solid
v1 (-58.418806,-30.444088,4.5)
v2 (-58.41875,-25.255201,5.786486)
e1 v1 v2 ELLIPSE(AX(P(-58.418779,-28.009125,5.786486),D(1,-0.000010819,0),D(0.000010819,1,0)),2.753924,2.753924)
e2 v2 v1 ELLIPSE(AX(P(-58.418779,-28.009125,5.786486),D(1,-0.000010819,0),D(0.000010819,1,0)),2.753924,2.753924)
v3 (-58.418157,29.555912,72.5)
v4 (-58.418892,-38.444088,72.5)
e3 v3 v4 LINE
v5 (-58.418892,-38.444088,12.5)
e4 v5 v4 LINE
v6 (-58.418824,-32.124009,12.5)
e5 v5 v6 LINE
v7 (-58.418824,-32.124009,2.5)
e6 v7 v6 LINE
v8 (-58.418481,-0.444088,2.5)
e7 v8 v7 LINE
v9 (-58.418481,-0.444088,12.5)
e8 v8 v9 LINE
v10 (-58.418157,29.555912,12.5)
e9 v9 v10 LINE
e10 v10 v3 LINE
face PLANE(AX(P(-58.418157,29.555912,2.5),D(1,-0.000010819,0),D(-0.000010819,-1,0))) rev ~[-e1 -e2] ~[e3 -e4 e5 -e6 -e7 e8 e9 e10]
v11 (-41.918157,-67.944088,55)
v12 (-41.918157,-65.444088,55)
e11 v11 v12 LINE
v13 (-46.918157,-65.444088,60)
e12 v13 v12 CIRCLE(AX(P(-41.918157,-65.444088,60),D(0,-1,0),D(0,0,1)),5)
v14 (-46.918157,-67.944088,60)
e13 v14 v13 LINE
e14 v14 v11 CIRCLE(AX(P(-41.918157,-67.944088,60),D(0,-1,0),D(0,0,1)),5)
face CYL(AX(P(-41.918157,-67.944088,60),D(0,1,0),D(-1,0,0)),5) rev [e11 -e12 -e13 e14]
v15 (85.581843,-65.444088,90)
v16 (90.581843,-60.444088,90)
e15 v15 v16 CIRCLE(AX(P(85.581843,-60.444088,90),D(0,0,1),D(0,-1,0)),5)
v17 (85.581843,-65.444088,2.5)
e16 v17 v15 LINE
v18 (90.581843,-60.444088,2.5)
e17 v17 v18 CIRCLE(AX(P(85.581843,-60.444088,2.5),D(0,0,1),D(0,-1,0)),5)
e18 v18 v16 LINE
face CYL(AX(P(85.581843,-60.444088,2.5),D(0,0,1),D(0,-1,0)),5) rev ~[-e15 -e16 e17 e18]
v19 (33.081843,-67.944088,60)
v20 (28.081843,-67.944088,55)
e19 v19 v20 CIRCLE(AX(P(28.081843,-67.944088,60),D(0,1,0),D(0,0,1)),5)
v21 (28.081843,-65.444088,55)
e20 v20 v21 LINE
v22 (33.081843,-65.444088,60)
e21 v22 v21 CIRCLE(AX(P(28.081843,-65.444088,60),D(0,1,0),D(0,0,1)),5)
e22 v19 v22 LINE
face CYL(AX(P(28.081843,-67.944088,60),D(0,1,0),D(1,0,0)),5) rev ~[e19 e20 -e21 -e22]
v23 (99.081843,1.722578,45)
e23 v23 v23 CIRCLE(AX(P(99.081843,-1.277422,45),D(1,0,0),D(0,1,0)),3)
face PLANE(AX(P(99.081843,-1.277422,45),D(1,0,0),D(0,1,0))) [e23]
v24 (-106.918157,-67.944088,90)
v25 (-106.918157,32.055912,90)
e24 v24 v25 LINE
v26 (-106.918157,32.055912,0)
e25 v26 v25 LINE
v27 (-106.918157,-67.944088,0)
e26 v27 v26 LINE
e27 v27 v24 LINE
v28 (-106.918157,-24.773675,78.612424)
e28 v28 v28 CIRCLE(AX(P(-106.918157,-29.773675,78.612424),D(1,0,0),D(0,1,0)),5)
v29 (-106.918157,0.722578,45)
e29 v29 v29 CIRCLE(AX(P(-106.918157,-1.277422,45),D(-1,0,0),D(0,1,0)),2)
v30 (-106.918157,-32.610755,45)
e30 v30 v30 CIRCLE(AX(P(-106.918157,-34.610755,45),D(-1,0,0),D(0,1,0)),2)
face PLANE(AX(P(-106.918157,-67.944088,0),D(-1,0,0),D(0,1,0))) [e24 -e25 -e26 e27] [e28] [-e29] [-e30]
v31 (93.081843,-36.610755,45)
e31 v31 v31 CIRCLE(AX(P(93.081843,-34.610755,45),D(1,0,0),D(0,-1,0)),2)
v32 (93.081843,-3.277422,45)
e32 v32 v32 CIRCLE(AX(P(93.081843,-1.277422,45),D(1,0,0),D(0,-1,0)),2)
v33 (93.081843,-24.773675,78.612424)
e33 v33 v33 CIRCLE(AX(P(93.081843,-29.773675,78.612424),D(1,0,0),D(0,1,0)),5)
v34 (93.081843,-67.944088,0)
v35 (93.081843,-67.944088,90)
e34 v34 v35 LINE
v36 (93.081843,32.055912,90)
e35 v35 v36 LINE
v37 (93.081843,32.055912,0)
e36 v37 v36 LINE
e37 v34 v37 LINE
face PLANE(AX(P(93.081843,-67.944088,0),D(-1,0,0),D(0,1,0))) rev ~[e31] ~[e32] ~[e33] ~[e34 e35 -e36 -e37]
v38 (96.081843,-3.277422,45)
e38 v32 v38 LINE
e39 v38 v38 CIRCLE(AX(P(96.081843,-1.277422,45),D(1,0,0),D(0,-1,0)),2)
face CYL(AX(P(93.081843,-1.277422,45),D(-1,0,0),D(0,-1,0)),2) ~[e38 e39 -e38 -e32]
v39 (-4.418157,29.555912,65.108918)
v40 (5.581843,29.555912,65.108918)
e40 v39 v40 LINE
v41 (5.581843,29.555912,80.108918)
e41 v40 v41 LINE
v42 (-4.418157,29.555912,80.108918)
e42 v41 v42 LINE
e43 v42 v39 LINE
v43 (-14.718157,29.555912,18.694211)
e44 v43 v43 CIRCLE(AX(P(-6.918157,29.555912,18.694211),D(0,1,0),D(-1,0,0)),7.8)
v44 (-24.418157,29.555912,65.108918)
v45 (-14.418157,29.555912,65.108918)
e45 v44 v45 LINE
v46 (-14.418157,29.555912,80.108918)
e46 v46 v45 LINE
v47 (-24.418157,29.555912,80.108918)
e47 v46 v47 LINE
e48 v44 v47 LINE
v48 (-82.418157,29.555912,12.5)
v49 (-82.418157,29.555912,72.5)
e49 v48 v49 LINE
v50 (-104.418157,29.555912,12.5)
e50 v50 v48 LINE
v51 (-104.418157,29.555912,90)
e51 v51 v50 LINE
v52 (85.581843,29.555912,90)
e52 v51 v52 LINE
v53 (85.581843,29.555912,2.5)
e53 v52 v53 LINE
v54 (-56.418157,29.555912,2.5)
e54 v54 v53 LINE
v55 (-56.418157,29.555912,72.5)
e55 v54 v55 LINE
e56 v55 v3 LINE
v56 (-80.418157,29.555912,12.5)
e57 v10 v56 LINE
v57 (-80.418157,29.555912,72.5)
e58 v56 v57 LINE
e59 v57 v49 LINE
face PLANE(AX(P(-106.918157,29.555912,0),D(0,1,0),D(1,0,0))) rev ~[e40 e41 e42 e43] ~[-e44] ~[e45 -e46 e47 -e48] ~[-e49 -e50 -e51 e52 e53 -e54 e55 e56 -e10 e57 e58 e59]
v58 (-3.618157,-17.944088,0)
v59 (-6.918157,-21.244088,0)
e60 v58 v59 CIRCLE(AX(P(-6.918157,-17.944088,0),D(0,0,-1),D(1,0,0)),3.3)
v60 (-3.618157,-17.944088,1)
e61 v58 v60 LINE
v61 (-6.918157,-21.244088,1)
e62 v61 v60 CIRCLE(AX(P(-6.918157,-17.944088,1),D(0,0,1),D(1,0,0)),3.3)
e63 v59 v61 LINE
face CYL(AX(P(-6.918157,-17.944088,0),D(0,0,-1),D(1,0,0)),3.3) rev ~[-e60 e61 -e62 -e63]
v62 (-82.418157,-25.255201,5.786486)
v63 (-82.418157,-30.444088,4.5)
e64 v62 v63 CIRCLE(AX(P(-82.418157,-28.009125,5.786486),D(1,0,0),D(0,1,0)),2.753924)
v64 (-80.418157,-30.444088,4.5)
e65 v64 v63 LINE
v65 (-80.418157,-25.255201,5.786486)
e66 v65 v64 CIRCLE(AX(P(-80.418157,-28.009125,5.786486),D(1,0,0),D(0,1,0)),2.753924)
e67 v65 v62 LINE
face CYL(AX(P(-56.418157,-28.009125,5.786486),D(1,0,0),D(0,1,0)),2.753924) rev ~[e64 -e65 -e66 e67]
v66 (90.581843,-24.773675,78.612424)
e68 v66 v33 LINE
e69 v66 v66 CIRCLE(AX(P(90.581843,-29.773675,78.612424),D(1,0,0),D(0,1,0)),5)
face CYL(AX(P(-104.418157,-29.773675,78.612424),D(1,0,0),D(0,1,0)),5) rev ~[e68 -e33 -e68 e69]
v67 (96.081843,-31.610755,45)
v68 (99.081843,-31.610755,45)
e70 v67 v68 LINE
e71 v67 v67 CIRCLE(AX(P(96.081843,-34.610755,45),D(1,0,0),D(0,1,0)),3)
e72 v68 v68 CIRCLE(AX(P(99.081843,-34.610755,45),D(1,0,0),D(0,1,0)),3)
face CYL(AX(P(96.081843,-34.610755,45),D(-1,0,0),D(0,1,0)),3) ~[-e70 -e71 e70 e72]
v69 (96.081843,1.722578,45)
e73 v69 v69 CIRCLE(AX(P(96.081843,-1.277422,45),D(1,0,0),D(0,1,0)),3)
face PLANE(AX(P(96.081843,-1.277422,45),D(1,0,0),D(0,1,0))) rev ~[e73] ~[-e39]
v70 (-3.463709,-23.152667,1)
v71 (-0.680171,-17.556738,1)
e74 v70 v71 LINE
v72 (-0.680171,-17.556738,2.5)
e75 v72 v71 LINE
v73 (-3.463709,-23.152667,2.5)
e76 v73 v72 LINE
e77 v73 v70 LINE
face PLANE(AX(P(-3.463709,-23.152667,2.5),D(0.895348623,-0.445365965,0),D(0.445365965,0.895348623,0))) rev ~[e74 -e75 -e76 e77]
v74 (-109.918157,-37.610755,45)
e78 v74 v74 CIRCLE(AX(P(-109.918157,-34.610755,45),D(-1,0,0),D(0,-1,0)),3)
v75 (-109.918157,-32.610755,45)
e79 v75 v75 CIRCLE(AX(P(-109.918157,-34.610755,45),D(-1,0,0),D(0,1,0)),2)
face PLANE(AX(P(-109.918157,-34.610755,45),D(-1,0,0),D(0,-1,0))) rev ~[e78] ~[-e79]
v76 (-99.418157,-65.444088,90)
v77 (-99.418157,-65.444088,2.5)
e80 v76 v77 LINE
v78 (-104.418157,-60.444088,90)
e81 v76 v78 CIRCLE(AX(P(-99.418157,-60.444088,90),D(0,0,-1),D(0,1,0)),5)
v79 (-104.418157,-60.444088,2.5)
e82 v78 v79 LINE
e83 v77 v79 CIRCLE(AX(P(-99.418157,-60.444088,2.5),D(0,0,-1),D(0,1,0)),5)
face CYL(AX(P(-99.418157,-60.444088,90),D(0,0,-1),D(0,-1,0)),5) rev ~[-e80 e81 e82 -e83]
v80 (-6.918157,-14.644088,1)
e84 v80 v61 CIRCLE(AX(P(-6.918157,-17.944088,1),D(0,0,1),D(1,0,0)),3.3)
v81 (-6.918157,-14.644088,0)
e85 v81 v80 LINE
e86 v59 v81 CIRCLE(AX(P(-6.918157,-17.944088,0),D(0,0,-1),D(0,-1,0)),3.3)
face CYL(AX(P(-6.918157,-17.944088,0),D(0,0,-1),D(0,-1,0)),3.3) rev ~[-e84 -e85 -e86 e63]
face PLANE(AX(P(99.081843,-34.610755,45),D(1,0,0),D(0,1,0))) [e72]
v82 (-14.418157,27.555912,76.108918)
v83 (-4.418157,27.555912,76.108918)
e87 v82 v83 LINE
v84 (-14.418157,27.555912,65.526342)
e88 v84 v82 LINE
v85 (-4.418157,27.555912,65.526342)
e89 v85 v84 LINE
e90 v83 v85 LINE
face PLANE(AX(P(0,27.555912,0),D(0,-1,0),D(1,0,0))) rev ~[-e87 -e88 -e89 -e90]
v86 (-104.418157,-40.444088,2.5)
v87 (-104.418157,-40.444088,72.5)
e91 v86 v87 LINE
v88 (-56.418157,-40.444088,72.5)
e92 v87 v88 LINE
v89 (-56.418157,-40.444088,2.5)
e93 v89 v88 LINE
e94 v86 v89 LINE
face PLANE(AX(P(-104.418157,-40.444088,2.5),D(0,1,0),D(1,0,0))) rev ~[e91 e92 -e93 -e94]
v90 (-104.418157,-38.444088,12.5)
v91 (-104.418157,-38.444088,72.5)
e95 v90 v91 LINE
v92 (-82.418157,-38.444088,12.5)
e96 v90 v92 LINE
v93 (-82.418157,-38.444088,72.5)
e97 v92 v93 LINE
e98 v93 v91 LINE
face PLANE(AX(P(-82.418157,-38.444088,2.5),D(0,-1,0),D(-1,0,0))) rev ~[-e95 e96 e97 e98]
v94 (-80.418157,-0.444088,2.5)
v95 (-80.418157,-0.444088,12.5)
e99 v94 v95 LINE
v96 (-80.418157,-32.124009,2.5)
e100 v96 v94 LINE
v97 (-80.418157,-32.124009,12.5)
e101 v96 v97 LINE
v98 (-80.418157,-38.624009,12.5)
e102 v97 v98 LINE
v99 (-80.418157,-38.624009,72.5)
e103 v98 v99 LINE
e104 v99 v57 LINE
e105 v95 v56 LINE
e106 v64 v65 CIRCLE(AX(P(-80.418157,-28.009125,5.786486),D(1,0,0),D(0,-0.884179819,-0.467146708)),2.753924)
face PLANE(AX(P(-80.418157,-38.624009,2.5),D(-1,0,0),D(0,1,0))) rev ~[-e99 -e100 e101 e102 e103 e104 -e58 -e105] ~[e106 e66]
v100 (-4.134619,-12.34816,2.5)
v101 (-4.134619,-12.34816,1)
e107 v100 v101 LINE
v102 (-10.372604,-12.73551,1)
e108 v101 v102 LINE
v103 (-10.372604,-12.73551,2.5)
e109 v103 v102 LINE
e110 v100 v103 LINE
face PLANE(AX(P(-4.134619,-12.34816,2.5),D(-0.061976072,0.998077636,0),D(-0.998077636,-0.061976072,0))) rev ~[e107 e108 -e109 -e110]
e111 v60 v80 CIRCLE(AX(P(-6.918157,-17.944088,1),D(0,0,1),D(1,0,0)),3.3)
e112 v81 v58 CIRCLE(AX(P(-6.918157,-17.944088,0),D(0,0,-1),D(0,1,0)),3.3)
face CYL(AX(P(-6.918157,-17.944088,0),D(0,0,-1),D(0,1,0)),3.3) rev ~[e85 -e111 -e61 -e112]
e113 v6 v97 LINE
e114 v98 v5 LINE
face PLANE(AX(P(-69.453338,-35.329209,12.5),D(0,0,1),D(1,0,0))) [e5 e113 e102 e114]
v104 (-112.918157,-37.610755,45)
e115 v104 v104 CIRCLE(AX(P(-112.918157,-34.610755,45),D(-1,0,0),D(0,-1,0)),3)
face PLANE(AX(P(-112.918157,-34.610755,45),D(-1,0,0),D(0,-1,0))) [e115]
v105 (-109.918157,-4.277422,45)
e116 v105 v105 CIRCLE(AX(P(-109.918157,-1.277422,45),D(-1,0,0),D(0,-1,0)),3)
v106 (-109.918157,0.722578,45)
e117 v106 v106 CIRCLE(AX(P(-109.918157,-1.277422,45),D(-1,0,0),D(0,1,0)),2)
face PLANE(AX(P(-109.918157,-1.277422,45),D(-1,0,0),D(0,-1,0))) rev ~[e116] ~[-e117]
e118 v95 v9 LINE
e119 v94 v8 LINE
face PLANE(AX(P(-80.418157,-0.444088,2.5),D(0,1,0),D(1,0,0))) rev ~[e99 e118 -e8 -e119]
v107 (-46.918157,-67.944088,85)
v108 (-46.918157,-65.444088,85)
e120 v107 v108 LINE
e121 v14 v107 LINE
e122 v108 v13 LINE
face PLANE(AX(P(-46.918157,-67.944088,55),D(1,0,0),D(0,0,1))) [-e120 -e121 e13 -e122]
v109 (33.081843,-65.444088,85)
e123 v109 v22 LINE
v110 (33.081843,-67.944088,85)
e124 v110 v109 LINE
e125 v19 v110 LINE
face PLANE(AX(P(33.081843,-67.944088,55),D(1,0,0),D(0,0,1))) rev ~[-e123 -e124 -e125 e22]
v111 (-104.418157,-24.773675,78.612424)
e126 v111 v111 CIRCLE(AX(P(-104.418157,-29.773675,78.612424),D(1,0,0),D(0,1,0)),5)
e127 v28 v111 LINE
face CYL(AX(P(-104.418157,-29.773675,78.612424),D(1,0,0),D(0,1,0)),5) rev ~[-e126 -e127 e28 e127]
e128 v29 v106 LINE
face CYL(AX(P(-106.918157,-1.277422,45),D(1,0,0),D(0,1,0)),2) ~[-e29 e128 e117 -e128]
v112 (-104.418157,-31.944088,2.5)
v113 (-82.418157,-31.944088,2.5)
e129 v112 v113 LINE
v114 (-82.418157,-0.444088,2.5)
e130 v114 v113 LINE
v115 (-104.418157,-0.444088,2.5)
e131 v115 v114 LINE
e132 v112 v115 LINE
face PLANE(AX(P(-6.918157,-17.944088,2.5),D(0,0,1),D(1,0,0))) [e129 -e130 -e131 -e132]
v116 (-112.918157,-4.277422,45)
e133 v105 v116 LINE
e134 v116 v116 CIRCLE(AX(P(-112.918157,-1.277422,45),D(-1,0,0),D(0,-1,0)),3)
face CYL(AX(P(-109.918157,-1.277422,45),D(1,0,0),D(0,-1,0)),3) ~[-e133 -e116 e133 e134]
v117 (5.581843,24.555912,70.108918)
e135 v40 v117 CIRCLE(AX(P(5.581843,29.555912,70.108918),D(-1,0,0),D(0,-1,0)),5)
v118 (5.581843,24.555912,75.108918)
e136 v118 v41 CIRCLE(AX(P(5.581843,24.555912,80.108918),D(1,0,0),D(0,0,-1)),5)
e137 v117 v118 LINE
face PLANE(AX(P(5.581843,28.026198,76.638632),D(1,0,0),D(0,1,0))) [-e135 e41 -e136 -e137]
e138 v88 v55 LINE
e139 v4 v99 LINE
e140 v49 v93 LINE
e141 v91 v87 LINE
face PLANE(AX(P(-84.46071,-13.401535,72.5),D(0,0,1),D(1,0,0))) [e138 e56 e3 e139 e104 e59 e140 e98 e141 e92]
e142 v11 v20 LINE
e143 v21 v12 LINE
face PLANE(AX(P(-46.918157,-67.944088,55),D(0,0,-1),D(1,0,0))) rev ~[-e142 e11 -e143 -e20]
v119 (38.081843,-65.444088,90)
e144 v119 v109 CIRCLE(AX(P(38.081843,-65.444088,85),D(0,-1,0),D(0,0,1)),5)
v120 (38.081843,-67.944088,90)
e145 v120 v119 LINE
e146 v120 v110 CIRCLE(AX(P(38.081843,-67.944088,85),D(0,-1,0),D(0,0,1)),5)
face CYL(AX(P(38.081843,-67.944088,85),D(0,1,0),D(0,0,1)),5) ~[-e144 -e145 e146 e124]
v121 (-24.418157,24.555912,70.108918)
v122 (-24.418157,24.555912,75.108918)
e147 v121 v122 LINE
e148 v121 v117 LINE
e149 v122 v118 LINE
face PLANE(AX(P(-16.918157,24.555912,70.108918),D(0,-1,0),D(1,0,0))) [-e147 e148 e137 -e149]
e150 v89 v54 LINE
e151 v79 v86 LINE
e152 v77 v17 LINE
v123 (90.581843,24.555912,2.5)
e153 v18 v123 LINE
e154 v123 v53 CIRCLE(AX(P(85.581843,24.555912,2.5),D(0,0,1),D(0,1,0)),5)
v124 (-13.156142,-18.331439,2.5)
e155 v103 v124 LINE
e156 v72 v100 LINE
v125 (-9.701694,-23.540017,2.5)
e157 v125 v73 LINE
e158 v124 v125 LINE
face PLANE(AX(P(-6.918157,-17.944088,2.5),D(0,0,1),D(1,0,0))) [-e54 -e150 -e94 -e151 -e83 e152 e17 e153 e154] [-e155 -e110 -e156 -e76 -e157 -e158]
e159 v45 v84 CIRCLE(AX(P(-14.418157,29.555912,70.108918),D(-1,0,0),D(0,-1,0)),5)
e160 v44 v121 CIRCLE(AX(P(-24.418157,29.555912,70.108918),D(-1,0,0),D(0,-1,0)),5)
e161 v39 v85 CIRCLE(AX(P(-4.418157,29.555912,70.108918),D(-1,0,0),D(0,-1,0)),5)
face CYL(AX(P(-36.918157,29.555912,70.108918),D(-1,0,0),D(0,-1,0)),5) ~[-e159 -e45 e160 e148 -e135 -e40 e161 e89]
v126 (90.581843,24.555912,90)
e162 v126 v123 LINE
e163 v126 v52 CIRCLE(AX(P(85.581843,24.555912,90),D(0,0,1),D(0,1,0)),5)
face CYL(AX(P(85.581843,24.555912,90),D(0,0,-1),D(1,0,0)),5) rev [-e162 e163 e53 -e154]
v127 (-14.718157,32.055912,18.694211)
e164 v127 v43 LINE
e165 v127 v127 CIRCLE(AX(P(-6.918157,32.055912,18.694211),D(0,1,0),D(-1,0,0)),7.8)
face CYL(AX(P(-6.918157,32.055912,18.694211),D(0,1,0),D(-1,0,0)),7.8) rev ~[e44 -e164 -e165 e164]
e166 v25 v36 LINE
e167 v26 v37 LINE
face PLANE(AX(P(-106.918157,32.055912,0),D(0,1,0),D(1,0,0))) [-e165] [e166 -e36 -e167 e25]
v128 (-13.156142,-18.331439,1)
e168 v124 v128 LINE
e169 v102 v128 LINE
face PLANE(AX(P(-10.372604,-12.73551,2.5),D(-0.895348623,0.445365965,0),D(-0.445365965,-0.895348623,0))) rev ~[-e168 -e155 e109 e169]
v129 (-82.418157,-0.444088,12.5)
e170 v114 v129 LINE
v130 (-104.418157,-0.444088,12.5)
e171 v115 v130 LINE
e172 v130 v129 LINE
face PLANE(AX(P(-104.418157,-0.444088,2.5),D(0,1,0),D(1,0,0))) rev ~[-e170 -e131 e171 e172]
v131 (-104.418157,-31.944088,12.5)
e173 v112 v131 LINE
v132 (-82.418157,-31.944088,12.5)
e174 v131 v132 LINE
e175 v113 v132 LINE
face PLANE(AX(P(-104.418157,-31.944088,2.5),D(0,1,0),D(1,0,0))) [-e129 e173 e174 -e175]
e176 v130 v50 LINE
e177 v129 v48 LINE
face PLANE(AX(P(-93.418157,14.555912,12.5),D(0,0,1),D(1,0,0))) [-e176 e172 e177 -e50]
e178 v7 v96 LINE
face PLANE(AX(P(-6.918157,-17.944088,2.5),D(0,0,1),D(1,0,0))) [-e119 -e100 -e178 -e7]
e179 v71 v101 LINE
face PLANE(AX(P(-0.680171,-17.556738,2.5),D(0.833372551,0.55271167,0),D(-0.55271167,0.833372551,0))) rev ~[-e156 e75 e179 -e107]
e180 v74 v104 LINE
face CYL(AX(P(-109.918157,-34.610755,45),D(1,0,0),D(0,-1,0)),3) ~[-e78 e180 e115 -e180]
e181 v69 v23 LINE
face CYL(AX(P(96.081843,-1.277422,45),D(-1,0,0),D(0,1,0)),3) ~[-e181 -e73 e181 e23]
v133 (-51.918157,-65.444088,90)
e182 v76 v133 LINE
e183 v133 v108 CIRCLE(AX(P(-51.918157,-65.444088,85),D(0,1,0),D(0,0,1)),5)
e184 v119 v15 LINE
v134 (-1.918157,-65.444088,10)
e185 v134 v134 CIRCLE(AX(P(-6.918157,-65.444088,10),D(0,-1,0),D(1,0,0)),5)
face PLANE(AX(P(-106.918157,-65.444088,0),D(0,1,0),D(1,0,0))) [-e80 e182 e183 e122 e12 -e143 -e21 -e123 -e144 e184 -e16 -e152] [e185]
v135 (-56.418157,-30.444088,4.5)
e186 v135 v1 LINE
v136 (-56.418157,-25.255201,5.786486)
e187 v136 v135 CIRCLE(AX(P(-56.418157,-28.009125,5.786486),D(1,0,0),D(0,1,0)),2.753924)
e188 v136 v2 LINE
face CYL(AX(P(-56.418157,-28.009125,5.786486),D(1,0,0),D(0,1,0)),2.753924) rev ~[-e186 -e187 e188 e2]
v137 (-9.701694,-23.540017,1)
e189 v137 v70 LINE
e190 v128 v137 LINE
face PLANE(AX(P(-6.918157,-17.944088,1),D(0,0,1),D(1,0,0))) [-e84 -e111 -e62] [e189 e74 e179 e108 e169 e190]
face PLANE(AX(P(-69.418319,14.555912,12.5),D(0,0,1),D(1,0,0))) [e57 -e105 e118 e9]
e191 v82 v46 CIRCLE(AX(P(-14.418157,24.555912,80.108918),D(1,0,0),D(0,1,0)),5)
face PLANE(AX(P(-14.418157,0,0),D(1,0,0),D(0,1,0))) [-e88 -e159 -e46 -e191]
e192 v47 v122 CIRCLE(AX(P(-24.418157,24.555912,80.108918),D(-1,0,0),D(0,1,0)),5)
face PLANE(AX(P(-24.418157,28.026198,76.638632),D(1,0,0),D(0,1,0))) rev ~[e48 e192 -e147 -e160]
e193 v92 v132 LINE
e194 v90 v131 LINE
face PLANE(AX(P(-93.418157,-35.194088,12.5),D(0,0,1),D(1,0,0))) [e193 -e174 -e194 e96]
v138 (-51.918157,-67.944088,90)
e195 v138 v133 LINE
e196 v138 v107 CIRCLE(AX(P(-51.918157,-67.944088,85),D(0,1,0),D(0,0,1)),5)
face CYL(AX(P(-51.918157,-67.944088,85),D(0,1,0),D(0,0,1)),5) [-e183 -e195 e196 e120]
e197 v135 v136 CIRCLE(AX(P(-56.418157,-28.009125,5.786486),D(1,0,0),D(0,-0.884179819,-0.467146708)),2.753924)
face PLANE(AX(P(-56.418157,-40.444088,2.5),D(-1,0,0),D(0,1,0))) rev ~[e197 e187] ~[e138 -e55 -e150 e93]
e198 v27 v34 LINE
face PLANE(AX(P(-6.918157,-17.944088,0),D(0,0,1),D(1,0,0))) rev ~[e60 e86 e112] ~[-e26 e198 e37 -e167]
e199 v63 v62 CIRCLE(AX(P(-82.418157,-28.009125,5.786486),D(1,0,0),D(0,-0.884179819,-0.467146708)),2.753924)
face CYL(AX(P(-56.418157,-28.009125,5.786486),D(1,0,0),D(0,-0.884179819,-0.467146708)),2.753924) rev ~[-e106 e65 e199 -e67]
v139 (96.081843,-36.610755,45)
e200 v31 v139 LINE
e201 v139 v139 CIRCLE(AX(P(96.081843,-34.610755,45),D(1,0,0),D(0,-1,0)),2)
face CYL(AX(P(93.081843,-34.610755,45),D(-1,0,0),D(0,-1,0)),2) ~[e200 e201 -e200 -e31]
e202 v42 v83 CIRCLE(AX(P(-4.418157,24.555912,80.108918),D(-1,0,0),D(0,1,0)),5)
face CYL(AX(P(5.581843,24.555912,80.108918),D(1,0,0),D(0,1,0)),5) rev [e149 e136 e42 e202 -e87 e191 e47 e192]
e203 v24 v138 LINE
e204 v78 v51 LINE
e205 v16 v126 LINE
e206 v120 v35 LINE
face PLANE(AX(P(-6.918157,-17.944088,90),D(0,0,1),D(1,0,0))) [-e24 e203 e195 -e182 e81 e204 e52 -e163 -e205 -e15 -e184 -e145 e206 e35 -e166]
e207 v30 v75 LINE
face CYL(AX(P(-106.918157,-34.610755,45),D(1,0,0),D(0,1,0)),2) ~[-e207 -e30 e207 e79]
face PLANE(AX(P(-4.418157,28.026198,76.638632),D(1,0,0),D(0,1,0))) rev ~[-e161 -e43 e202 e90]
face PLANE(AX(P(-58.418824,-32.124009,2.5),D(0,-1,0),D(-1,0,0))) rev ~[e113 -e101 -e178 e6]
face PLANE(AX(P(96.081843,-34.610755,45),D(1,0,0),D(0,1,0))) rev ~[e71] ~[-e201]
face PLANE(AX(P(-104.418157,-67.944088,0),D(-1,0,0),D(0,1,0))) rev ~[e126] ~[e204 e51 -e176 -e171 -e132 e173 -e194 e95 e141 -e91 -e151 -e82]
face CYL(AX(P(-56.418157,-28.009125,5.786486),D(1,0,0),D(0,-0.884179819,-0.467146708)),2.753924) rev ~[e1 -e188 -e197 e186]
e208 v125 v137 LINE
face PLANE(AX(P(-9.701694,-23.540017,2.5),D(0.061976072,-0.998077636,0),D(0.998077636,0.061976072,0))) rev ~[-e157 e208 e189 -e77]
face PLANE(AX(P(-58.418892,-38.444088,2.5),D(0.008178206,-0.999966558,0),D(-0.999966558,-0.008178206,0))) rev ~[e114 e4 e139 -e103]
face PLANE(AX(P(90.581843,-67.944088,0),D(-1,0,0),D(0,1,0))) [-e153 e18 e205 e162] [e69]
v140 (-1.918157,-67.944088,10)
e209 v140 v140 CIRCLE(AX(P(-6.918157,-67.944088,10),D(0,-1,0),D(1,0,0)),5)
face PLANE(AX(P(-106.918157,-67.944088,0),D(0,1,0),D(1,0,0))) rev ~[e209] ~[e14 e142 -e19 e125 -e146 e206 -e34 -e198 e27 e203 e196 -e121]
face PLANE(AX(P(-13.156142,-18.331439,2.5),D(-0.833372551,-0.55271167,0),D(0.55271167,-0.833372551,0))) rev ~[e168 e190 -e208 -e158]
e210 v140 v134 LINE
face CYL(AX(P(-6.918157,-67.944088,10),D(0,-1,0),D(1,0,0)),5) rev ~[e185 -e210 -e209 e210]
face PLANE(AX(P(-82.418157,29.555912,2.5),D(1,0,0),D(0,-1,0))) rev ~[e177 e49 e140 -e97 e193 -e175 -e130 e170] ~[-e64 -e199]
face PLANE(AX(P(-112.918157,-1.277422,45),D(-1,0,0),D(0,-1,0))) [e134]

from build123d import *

# Parameters (mm, degrees)
F0_W          = 200
F0_H          = 100
F1_DEPTH      = 90
F2_T          = -2.5
F4_DEPTH      = 70
F5_W          = 80
F5_H          = 35
F5_R          = 5
F6_DEPTH      = 3
F8_DEPTH      = 3
F9_R          = 3.3
F10_DEPTH     = 1.5
F11_R         = 7.8
F12_DEPTH     = 3
F13_R         = 5
F14_R         = 5
F16_DEPTH     = 3
F17_R         = 2
F17_R_2       = 3
F18_R         = 3
F18_R_2       = 2
F19_DEPTH     = 3
F21_DEPTH     = 3
F22_R         = 3
F22_R_2       = 2
F23_DEPTH     = 3
F24_R         = 5
F25_DEPTH     = 400
F26_W         = 22
F26_H         = 30
F26_H_2       = 6.5
F27_W         = 21.9996754151
F27_H         = 30
F29_DEPTH     = 10
F31_W         = 15
F31_H         = 10
F32_DEPTH     = 5
F33_W         = 10
F33_H         = 2
F34_DEPTH     = 10
F35_T4_DEPTH  = 10
F35_T9_DEPTH  = 10
F35_T14_DEPTH = 22.5
F35_T21_DEPTH = 22.5
F35_T27_DEPTH = 22.5
F35_T33_DEPTH = 22.5
F35_T39_DEPTH = 22.5
F35_T45_DEPTH = 22.5
F35_T52_DEPTH = 10
F35_T57_DEPTH = 10
F35_T59_DEPTH = 55
F36_DEPTH     = 35


# Not quite as in the source:
# - a fillet or chamfer that OpenCascade refuses, or shapes differently, is made with other operations: its cross-section is extruded or revolved along the edge and cut away or added
# - ends of sketch curves that miss each other by under 0.0002 mm in the source are joined
# - a feature names something its author has since deleted; it is built from what else it names


with BuildPart() as f1:
    # F0 (on Top) → F1 (new body)
    with BuildSketch(Plane.XY):
        with Locations((-6.9181565195, -17.9440884142)):
            Rectangle(F0_W, F0_H)
    extrude(amount=F1_DEPTH)

    # F2
    f2_openings = [f1.faces().sort_by_distance(p)[0] for p in [
        (-6.918157, -17.944088, 90),
    ]]
    offset(amount=F2_T, openings=f2_openings)

    # F3 (on face) → F4 (join)
    with BuildSketch(Plane.XY.offset(2.5)):
        Polygon((-82.4181565195, -38.4440884142), (-104.4181565195, -38.4440884142), (-104.4181565195, -40.4440884142), (-82.4181565195, -40.4440884142), (-80.4181565195, -40.4440884142), (-80.4181565195, -38.6240089446), (-80.4181565195, 29.5559115858), (-82.4181565195, 29.5559115858), align=None)
        Polygon((-58.4188922454, -38.4440884142), (-80.4181565195, -38.6240089446), (-80.4181565195, -40.4440884142), (-56.4181565195, -40.4440884142), (-56.4181565195, -38.4440884142), (-56.4181565195, 29.5559115858), (-58.4181565195, 29.5559115858), align=None)
    extrude(amount=F4_DEPTH)

    # F5 (on face) → F6 (cut)
    with BuildSketch(Plane.XZ.offset(67.9440884142)):
        with Locations((-6.9181565195, 72.5)):
            Rectangle(F5_W, F5_H)
        with Locations((-6.9181565195, 10)):
            Circle(F5_R)
    extrude(amount=-F6_DEPTH, mode=Mode.SUBTRACT)

    # F7 (on face) → F8 (cut)
    with BuildSketch(Plane(origin=(0, 0, 0), x_dir=(1, 0, 0), z_dir=(0, 0, -1))):
        with BuildLine():
            ThreePointArc((-3.6181565195, 17.9440884142), (-4.5847041416, 20.2775407921), (-6.9181565195, 21.2440884142))
            Line((-6.9181565195, 21.2440884142), (-6.9181565195, 14.6440884142))
            ThreePointArc((-6.9181565195, 14.6440884142), (-4.5847041416, 15.6106360363), (-3.6181565195, 17.9440884142))
        make_face()
        with BuildLine():
            Line((-6.9181565195, 14.6440884142), (-6.9181565195, 21.2440884142))
            ThreePointArc((-6.9181565195, 21.2440884142), (-10.2181565195, 17.9440884142), (-6.9181565195, 14.6440884142))
        make_face()
    extrude(amount=-F8_DEPTH, mode=Mode.SUBTRACT)

    # F9 (on face) → F10 (cut)
    with BuildSketch(Plane.XY.offset(2.5)):
        Polygon((-4.1346192375, -12.3481595191), (-10.3726044595, -12.735509968), (-13.1561417415, -18.3314388632), (-9.7016938016, -23.5400173094), (-3.4637085796, -23.1526668604), (-0.6801712975, -17.5567379653), align=None)
        with Locations((-6.9181565195, -17.9440884142)):
            Circle(F9_R, mode=Mode.SUBTRACT)
    extrude(amount=-F10_DEPTH, mode=Mode.SUBTRACT)

    # F11 (on face) → F12 (cut)
    with BuildSketch(Plane(origin=(0, 32.0559115858, 0), x_dir=(-1, 0, 0), z_dir=(0, 1, 0))):
        with Locations((6.9181565195, 18.6942107975)):
            Circle(F11_R)
    extrude(amount=-F12_DEPTH, mode=Mode.SUBTRACT)

    # F13
    f13_edges = [f1.edges().sort_by_distance(p)[0] for p in [
        (90.581843, 29.555912, 46.25),
        (90.581843, -65.444088, 46.25),
        (-104.418157, -65.444088, 46.25),
    ]]
    fillet(f13_edges, radius=F13_R)

    # F14
    f14_edges = [f1.edges().sort_by_distance(p)[0] for p in [
        (33.081843, -66.694088, 55),
        (-46.918157, -66.694088, 55),
        (-46.918157, -66.694088, 90),
        (33.081843, -66.694088, 90),
    ]]
    fillet(f14_edges, radius=F14_R)

    # F15 (on face) → F16 (join)
    with BuildSketch(Plane.YZ.offset(93.0818434805)):
        with BuildLine():
            ThreePointArc((-32.6107550809, 45), (-34.6107550809, 47), (-36.6107550809, 45))
            Line((-36.6107550809, 45), (-34.6107550809, 45))
            Line((-34.6107550809, 45), (-32.6107550809, 45))
        make_face()
        with BuildLine():
            ThreePointArc((0.7225782525, 45), (-1.2774217475, 47), (-3.2774217475, 45))
            Line((-3.2774217475, 45), (-1.2774217475, 45))
            Line((-1.2774217475, 45), (0.7225782525, 45))
        make_face()
        with BuildLine():
            Line((-1.2774217475, 45), (-3.2774217475, 45))
            ThreePointArc((-3.2774217475, 45), (-1.2774217475, 43), (0.7225782525, 45))
            Line((0.7225782525, 45), (-1.2774217475, 45))
        make_face()
        with BuildLine():
            Line((-34.6107550809, 45), (-36.6107550809, 45))
            ThreePointArc((-36.6107550809, 45), (-34.6107550809, 43), (-32.6107550809, 45))
            Line((-32.6107550809, 45), (-34.6107550809, 45))
        make_face()
    extrude(amount=F16_DEPTH)

    # F17 (on face) + F18 (on face) → F19 (join)
    with BuildSketch(Plane.YZ.offset(96.0818434805)):
        with Locations((-34.6107550809, 45)):
            Circle(F17_R)
        with Locations((-1.2774217475, 45)):
            Circle(F17_R_2)
    with BuildSketch(Plane.YZ.offset(96.0818434805)):
        with Locations((-34.6107550809, 45)):
            Circle(F18_R)
        with Locations((-34.6107550809, 45)):
            Circle(F18_R_2, mode=Mode.SUBTRACT)
    extrude(amount=F19_DEPTH)

    # F20 (on face) → F21 (join)
    with BuildSketch(Plane(origin=(-106.9181565195, 0, 0), x_dir=(0, -1, 0), z_dir=(-1, 0, 0))):
        with BuildLine():
            ThreePointArc((3.2774217475, 45), (1.2774217475, 47), (-0.7225782525, 45))
            Line((-0.7225782525, 45), (1.2774217475, 45))
            Line((1.2774217475, 45), (3.2774217475, 45))
        make_face()
        with BuildLine():
            Line((1.2774217475, 45), (-0.7225782525, 45))
            ThreePointArc((-0.7225782525, 45), (1.2774217475, 43), (3.2774217475, 45))
            Line((3.2774217475, 45), (1.2774217475, 45))
        make_face()
        with BuildLine():
            ThreePointArc((36.6107550809, 45), (34.6107550809, 47), (32.6107550809, 45))
            Line((32.6107550809, 45), (34.6107550809, 45))
            Line((34.6107550809, 45), (36.6107550809, 45))
        make_face()
        with BuildLine():
            Line((34.6107550809, 45), (32.6107550809, 45))
            ThreePointArc((32.6107550809, 45), (34.6107550809, 43), (36.6107550809, 45))
            Line((36.6107550809, 45), (34.6107550809, 45))
        make_face()
    extrude(amount=F21_DEPTH)

    # F22 (on face) → F23 (join)
    with BuildSketch(Plane(origin=(-109.9181565195, 0, 0), x_dir=(0, -1, 0), z_dir=(-1, 0, 0))):
        with Locations((1.2774217475, 45)):
            Circle(F22_R)
        with Locations((1.2774217475, 45)):
            Circle(F22_R_2, mode=Mode.SUBTRACT)
        with Locations((1.2774217475, 45)):
            Circle(F22_R_2)
        with Locations((34.6107550809, 45)):
            Circle(F22_R)
    extrude(amount=F23_DEPTH)

    # F24 (on face) → F25 (cut, symmetric)
    with BuildSketch(Plane.YZ.offset(-104.4181565195)):
        with Locations((-29.7736749053, 78.6124244332)):
            Circle(F24_R)
    extrude(amount=F25_DEPTH, both=True, mode=Mode.SUBTRACT)

    # F26 (on face) + F27 (on face) + F28 (on face) → F29 (join)
    with BuildSketch(Plane.XY.offset(2.5)):
        with Locations((-93.4181565195, 14.5559115858)):
            Rectangle(F26_W, F26_H)
        with Locations((-93.4181565195, -35.1940884142)):
            Rectangle(F26_W, F26_H_2)
    with BuildSketch(Plane.XY.offset(2.5)):
        with Locations((-69.418318812, 14.5559115858)):
            Rectangle(F27_W, F27_H)
        Polygon((-58.4181565195, 29.5559115858), (-58.4184811045, 29.5559115858), (-58.4184811045, -0.4440884142), align=None)
    with BuildSketch(Plane.XY.offset(2.5)):
        Polygon((-80.4181565195, -32.1240089446), (-80.4181565195, -38.6240089446), (-58.4188922454, -38.4440884142), (-58.4188238653, -32.1240089446), align=None)
    extrude(amount=F29_DEPTH)

    # F31 (on face) → F32 (join)
    with BuildSketch(Plane.XZ.offset(-29.5559115858)):
        with Locations((-16.9181565195, 70.1089176536)):
            Rectangle(F31_W, F31_H)
        with Locations((-1.9181565195, 70.1089176536)):
            Rectangle(F31_W, F31_H)
    extrude(amount=F32_DEPTH)

    # F33 (on face) → F34 (cut)
    with BuildSketch(Plane.XY.offset(75.1089176536)):
        with Locations((-9.4181565195, 28.5559115858)):
            Rectangle(F33_W, F33_H)
    extrude(amount=-F34_DEPTH, mode=Mode.SUBTRACT)

    # F35: fillet of radius 5 on 3 edges, made by hand


with BuildPart() as f35_tool2:
    # F35_s3 → F35_t4 (new body)
    with BuildSketch(Plane.YZ.offset(5.5818434805)):
        with BuildLine():
            ThreePointArc((29.5559115858, 80.1089176536), (28.0914454917, 76.5733837476), (24.5559115858, 75.1089176536))
            Line((24.5559115858, 75.1089176536), (29.5559115858, 75.1089176536))
            Line((29.5559115858, 75.1089176536), (29.5559115858, 80.1089176536))
        make_face()
    extrude(amount=-F35_T4_DEPTH)

    split(bisect_by=Plane.XZ.offset(-27.5559115858), keep=Keep.BOTTOM)


with BuildPart() as f1_1:
    add(f1.part)

    # F35_t1: union F35_tool2
    add(f35_tool2.part)


with BuildPart() as f35_tool7:
    # F35_s8 → F35_t9 (new body)
    with BuildSketch(Plane.YZ.offset(5.5818434805)):
        with BuildLine():
            ThreePointArc((29.5559115858, 80.1089176536), (28.0914454917, 76.5733837476), (24.5559115858, 75.1089176536))
            Line((24.5559115858, 75.1089176536), (29.5559115858, 75.1089176536))
            Line((29.5559115858, 75.1089176536), (29.5559115858, 80.1089176536))
        make_face()
    extrude(amount=-F35_T9_DEPTH)

    split(bisect_by=Plane.XZ.offset(-27.5559115858), keep=Keep.TOP)


with BuildPart() as f1_2:
    add(f1_1.part)

    # F35_t6: union F35_tool7
    add(f35_tool7.part)


with BuildPart() as f35_tool12:
    # F35_s13 → F35_t14 (new body)
    with BuildSketch(Plane.YZ.offset(5.5818434805)):
        with BuildLine():
            ThreePointArc((29.5559115858, 80.1089176536), (28.0914454917, 76.5733837476), (24.5559115858, 75.1089176536))
            Line((24.5559115858, 75.1089176536), (29.5559115858, 75.1089176536))
            Line((29.5559115858, 75.1089176536), (29.5559115858, 80.1089176536))
        make_face()
    extrude(amount=-F35_T14_DEPTH)

    split(bisect_by=Plane.YZ.offset(-4.4181565195), keep=Keep.BOTTOM)

    split(bisect_by=Plane.XZ.offset(-27.5559115858), keep=Keep.TOP)

    split(bisect_by=Plane.YZ.offset(-14.4181565195), keep=Keep.TOP)


with BuildPart() as f1_3:
    add(f1_2.part)

    # F35_t11: union F35_tool12
    add(f35_tool12.part)


with BuildPart() as f35_tool19:
    # F35_s20 → F35_t21 (new body)
    with BuildSketch(Plane.YZ.offset(5.5818434805)):
        with BuildLine():
            ThreePointArc((29.5559115858, 80.1089176536), (28.0914454917, 76.5733837476), (24.5559115858, 75.1089176536))
            Line((24.5559115858, 75.1089176536), (29.5559115858, 75.1089176536))
            Line((29.5559115858, 75.1089176536), (29.5559115858, 80.1089176536))
        make_face()
    extrude(amount=-F35_T21_DEPTH)

    split(bisect_by=Plane.XZ.offset(-27.5559115858), keep=Keep.BOTTOM)

    split(bisect_by=Plane.YZ.offset(-14.4181565195), keep=Keep.BOTTOM)


with BuildPart() as f1_4:
    add(f1_3.part)

    # F35_t18: union F35_tool19
    add(f35_tool19.part)


with BuildPart() as f35_tool25:
    # F35_s26 → F35_t27 (new body)
    with BuildSketch(Plane.YZ.offset(5.5818434805)):
        with BuildLine():
            ThreePointArc((29.5559115858, 80.1089176536), (28.0914454917, 76.5733837476), (24.5559115858, 75.1089176536))
            Line((24.5559115858, 75.1089176536), (29.5559115858, 75.1089176536))
            Line((29.5559115858, 75.1089176536), (29.5559115858, 80.1089176536))
        make_face()
    extrude(amount=-F35_T27_DEPTH)

    split(bisect_by=Plane.XZ.offset(-27.5559115858), keep=Keep.TOP)

    split(bisect_by=Plane.YZ.offset(-14.4181565195), keep=Keep.BOTTOM)


with BuildPart() as f1_5:
    add(f1_4.part)

    # F35_t24: union F35_tool25
    add(f35_tool25.part)


with BuildPart() as f35_tool31:
    # F35_s32 → F35_t33 (new body)
    with BuildSketch(Plane.YZ.offset(-1.9181565195)):
        with BuildLine():
            ThreePointArc((29.5559115858, 80.1089176536), (28.0914454917, 76.5733837476), (24.5559115858, 75.1089176536))
            Line((24.5559115858, 75.1089176536), (29.5559115858, 75.1089176536))
            Line((29.5559115858, 75.1089176536), (29.5559115858, 80.1089176536))
        make_face()
    extrude(amount=-F35_T33_DEPTH)

    split(bisect_by=Plane.YZ.offset(-4.4181565195), keep=Keep.TOP)

    split(bisect_by=Plane.XZ.offset(-27.5559115858), keep=Keep.BOTTOM)


with BuildPart() as f1_6:
    add(f1_5.part)

    # F35_t30: union F35_tool31
    add(f35_tool31.part)


with BuildPart() as f35_tool37:
    # F35_s38 → F35_t39 (new body)
    with BuildSketch(Plane.YZ.offset(-1.9181565195)):
        with BuildLine():
            ThreePointArc((29.5559115858, 80.1089176536), (28.0914454917, 76.5733837476), (24.5559115858, 75.1089176536))
            Line((24.5559115858, 75.1089176536), (29.5559115858, 75.1089176536))
            Line((29.5559115858, 75.1089176536), (29.5559115858, 80.1089176536))
        make_face()
    extrude(amount=-F35_T39_DEPTH)

    split(bisect_by=Plane.YZ.offset(-4.4181565195), keep=Keep.TOP)

    split(bisect_by=Plane.XZ.offset(-27.5559115858), keep=Keep.TOP)


with BuildPart() as f1_7:
    add(f1_6.part)

    # F35_t36: union F35_tool37
    add(f35_tool37.part)


with BuildPart() as f35_tool43:
    # F35_s44 → F35_t45 (new body)
    with BuildSketch(Plane.YZ.offset(-1.9181565195)):
        with BuildLine():
            ThreePointArc((29.5559115858, 80.1089176536), (28.0914454917, 76.5733837476), (24.5559115858, 75.1089176536))
            Line((24.5559115858, 75.1089176536), (29.5559115858, 75.1089176536))
            Line((29.5559115858, 75.1089176536), (29.5559115858, 80.1089176536))
        make_face()
    extrude(amount=-F35_T45_DEPTH)

    split(bisect_by=Plane.YZ.offset(-14.4181565195), keep=Keep.TOP)

    split(bisect_by=Plane.YZ.offset(-4.4181565195), keep=Keep.BOTTOM)

    split(bisect_by=Plane.XZ.offset(-27.5559115858), keep=Keep.TOP)


with BuildPart() as f1_8:
    add(f1_7.part)

    # F35_t42: union F35_tool43
    add(f35_tool43.part)


with BuildPart() as f35_tool50:
    # F35_s51 → F35_t52 (new body)
    with BuildSketch(Plane.YZ.offset(-14.4181565195)):
        with BuildLine():
            ThreePointArc((29.5559115858, 80.1089176536), (28.0914454917, 76.5733837476), (24.5559115858, 75.1089176536))
            Line((24.5559115858, 75.1089176536), (29.5559115858, 75.1089176536))
            Line((29.5559115858, 75.1089176536), (29.5559115858, 80.1089176536))
        make_face()
    extrude(amount=-F35_T52_DEPTH)

    split(bisect_by=Plane.XZ.offset(-27.5559115858), keep=Keep.BOTTOM)


with BuildPart() as f1_9:
    add(f1_8.part)

    # F35_t49: union F35_tool50
    add(f35_tool50.part)


with BuildPart() as f35_tool55:
    # F35_s56 → F35_t57 (new body)
    with BuildSketch(Plane.YZ.offset(-14.4181565195)):
        with BuildLine():
            ThreePointArc((29.5559115858, 80.1089176536), (28.0914454917, 76.5733837476), (24.5559115858, 75.1089176536))
            Line((24.5559115858, 75.1089176536), (29.5559115858, 75.1089176536))
            Line((29.5559115858, 75.1089176536), (29.5559115858, 80.1089176536))
        make_face()
    extrude(amount=-F35_T57_DEPTH)

    split(bisect_by=Plane.XZ.offset(-27.5559115858), keep=Keep.TOP)


with BuildPart() as f1_10:
    add(f1_9.part)

    # F35_t54: union F35_tool55
    add(f35_tool55.part)

    # F35_s60 → F35_t59 (cut)
    with BuildSketch(Plane.YZ.offset(-36.9181565195)):
        with BuildLine():
            ThreePointArc((24.5559115858, 70.1089176536), (26.0203776799, 66.5733837476), (29.5559115858, 65.1089176536))
            Line((29.5559115858, 65.1089176536), (24.5559115858, 65.1089176536))
            Line((24.5559115858, 65.1089176536), (24.5559115858, 70.1089176536))
        make_face()
    extrude(amount=F35_T59_DEPTH, mode=Mode.SUBTRACT)

    # F30 (on face) → F36 (cut)
    with BuildSketch(Plane.YZ.offset(-56.4181565195)):
        with BuildLine():
            ThreePointArc((-30.4440884142, 4.5), (-27.3464061616, 3.113491758), (-25.2552007889, 5.786486433))
            ThreePointArc((-25.2552007889, 5.786486433), (-28.6718429924, 8.459481108), (-30.4440884142, 4.5))
        make_face()
    extrude(amount=-F36_DEPTH, mode=Mode.SUBTRACT)


solid = f1_10.part
